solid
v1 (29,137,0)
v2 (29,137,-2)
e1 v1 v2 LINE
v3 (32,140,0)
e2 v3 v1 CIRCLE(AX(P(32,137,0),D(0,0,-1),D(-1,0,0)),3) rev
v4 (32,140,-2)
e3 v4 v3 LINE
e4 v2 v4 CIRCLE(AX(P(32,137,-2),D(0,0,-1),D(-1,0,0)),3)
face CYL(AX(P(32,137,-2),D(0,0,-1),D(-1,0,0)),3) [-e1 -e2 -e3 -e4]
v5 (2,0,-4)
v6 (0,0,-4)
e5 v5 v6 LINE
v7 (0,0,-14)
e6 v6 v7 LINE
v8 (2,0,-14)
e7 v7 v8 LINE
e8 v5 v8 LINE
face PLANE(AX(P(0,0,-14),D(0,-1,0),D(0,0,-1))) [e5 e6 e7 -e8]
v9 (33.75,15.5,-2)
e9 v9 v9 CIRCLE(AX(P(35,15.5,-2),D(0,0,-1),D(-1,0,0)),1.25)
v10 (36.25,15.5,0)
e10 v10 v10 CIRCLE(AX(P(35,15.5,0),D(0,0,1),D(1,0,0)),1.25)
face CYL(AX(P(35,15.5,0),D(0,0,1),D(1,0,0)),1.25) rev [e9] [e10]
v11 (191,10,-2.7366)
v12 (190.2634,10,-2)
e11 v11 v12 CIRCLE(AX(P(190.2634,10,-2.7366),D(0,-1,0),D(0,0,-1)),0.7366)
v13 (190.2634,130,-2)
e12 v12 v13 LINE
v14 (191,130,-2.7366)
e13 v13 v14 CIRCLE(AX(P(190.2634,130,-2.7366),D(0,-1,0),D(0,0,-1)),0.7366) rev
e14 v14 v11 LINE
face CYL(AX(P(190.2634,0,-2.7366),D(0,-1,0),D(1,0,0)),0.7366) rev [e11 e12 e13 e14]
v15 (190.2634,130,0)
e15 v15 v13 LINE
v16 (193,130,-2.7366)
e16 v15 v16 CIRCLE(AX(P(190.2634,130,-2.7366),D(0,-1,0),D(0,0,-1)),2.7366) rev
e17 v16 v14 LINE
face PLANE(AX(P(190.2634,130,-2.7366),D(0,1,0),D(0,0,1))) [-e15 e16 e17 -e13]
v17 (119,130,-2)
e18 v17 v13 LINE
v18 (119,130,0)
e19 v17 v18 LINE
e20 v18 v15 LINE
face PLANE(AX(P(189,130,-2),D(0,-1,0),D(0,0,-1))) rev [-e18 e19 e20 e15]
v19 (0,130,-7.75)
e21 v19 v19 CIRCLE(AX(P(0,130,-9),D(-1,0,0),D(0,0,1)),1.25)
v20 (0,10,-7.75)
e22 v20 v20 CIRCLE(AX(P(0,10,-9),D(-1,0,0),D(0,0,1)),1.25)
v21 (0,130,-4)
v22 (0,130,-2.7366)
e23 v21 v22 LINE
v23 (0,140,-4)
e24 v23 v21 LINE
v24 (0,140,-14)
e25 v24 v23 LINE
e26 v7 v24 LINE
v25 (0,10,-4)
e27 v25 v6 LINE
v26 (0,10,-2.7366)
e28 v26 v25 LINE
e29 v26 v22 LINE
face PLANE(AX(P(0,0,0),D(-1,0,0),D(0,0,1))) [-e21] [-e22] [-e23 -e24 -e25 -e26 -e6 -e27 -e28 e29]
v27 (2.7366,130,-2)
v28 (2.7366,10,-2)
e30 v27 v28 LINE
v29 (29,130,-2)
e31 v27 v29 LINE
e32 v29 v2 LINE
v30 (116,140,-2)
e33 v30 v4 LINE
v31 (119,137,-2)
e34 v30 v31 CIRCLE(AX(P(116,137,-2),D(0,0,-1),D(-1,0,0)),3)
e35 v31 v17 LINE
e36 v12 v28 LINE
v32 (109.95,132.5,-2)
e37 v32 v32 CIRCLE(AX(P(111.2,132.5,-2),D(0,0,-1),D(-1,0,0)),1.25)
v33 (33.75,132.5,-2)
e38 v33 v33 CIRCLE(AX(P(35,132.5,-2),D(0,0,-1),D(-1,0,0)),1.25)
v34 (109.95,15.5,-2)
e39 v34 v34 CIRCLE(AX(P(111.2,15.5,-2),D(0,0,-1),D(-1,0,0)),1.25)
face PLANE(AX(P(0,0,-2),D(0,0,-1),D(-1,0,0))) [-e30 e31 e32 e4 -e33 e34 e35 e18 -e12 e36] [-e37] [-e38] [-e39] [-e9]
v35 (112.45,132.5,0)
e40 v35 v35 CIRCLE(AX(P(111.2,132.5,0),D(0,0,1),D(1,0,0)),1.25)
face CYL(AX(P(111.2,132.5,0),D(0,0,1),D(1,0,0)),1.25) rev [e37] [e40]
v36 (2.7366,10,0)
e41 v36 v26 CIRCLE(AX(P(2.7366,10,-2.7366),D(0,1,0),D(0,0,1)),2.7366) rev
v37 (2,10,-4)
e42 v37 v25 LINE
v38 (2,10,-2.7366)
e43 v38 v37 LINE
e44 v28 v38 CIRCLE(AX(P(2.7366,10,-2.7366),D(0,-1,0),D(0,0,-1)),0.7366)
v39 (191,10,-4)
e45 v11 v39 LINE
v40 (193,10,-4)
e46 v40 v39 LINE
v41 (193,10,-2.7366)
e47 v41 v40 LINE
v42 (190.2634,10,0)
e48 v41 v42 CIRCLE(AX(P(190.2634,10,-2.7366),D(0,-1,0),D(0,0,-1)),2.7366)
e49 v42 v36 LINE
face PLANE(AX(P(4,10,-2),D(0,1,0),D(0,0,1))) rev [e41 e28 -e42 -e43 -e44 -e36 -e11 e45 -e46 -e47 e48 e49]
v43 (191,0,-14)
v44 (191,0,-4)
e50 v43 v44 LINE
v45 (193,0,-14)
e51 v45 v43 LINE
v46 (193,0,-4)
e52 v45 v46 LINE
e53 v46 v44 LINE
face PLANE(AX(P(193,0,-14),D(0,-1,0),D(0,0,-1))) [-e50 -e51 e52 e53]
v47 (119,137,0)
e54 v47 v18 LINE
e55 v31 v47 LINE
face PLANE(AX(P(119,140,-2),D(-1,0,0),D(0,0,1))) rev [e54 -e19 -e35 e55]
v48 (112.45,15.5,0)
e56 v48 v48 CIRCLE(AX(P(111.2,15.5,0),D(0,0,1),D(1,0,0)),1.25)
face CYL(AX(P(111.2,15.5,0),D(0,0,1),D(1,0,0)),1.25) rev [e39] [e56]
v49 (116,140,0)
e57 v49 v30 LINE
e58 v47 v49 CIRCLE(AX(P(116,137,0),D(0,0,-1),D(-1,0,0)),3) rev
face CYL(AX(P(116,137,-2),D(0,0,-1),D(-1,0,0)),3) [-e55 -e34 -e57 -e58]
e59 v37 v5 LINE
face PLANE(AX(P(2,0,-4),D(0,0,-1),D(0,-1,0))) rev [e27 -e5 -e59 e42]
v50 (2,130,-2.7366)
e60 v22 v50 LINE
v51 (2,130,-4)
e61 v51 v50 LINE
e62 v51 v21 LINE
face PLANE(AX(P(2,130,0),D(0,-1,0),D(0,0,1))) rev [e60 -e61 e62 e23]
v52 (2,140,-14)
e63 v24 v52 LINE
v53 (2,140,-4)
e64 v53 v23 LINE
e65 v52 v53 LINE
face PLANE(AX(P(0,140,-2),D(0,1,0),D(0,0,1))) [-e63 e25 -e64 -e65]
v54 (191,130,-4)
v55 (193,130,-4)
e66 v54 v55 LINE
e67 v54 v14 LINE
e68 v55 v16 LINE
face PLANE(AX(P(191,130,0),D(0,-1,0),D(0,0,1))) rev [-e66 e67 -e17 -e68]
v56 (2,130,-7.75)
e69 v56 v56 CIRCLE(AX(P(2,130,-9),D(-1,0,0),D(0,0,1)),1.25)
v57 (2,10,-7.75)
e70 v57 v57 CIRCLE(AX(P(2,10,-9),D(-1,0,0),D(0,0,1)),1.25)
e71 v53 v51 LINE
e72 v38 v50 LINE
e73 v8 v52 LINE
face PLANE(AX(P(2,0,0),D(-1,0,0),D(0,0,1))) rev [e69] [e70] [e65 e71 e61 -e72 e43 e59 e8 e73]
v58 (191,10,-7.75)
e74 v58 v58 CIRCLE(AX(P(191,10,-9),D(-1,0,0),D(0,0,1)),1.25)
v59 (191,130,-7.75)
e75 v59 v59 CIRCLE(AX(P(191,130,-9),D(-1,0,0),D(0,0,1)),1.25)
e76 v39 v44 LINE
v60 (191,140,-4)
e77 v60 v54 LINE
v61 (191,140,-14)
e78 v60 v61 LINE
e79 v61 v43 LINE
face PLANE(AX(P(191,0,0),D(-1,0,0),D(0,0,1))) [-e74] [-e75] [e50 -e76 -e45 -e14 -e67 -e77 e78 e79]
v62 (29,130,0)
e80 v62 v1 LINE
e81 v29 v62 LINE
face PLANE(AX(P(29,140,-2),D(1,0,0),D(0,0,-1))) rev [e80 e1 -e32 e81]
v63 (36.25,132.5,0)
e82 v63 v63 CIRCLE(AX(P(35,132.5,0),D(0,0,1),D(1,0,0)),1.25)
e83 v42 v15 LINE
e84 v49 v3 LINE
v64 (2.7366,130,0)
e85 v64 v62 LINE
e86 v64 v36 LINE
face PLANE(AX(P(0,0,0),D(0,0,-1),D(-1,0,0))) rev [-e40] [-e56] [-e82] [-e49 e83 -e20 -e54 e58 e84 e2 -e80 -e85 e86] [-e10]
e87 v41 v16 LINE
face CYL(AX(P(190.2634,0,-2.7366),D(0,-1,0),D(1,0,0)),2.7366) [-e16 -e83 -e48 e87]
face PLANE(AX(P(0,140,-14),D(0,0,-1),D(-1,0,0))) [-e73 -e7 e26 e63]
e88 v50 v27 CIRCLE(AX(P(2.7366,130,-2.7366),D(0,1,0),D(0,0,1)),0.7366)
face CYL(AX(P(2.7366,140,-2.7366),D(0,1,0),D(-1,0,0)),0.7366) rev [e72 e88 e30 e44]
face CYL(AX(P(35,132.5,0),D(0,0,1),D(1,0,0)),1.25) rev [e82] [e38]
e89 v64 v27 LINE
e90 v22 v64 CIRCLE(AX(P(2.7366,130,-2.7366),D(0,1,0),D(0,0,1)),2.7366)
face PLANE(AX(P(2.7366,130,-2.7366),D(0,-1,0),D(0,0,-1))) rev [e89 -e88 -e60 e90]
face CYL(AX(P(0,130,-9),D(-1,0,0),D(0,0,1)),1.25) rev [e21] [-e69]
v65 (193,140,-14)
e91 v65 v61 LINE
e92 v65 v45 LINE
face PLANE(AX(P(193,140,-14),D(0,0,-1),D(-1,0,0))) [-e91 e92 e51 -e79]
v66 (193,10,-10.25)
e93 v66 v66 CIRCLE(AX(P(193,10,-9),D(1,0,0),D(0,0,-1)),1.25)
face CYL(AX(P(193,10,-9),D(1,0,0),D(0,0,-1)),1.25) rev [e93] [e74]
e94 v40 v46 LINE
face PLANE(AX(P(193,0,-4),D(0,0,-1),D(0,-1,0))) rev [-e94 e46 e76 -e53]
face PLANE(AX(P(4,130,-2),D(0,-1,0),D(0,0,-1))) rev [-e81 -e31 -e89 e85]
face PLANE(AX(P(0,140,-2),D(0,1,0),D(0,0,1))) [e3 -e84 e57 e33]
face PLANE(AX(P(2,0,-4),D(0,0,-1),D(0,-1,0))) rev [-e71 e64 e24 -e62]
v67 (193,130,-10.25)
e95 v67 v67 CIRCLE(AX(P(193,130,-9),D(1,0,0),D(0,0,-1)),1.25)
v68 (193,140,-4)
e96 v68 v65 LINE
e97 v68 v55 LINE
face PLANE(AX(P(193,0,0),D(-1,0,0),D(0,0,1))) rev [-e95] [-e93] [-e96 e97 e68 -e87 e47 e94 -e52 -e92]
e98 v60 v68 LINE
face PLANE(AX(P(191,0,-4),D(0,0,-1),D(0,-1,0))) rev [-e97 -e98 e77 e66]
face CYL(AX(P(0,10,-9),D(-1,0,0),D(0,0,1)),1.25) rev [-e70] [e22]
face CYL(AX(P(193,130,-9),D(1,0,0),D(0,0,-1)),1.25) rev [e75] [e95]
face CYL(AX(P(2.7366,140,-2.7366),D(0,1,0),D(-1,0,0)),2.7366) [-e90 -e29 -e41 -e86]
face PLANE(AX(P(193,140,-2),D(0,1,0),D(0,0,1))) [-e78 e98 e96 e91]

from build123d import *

# Parameters (mm, degrees)
SKETCH_3_W                         = 193
SKETCH_3_H                         = 140
SM_BASE_FLANGE_1_DEPTH             = 2
SM_EDGE_FLANGE_1_STRIP_W           = 9.4732
SM_EDGE_FLANGE_1_STRIP_H           = 2
SM_EDGE_FLANGE_1_STRIP_CUT_DEPTH   = 140
SM_EDGE_FLANGE_1_STRIP_2_W         = 9.4732
SM_EDGE_FLANGE_1_STRIP_2_H         = 2
SM_EDGE_FLANGE_1_STRIP_CUT_2_DEPTH = 140
SM_EDGE_FLANGE_1_DEPTH             = 140
SM_EDGE_FLANGE_1_BEND_DEPTH        = 140
HOLE_WIZARD_M3_2_D                 = 2.5
HOLE_WIZARD_M3_3_D                 = 2.5
HOLE_WIZARD_M3_3_DEPTH             = 2
HOLE_WIZARD_M3_4_D                 = 2.5
SKETCH_23_W                        = 185
SKETCH_23_H                        = 10
SKETCH_23_W_2                      = 25
SKETCH_23_W_3                      = 70
CUT_EXTRUDE_1_DEPTH                = 10
FILLET_1_R                         = 3
SKETCH_24_W                        = 4
SKETCH_24_H                        = 10
CUT_EXTRUDE_2_DEPTH                = 239.840951263
SKETCH_25_W                        = 4
SKETCH_25_H                        = 10
CUT_EXTRUDE_3_DEPTH                = 10
SKETCH_26_W                        = 4
SKETCH_26_H                        = 10
CUT_EXTRUDE_4_DEPTH                = 10


# Sheet-metal steps are written as plain solids
with BuildPart() as part:
    # ｽｹｯﾁ3 → ﾍﾞｰｽ-ﾌﾗﾝｼﾞ1 (new body)
    with BuildSketch(Plane.XY):
        with Locations((96.5, 70)):
            Rectangle(SKETCH_3_W, SKETCH_3_H)
    extrude(amount=-SM_BASE_FLANGE_1_DEPTH)

    # ｴｯｼﾞ-ﾌﾗﾝｼﾞ1 strip (across the edge) → ｴｯｼﾞ-ﾌﾗﾝｼﾞ1 strip cut (cut)
    with BuildSketch(Plane(origin=(0, 0, -2), x_dir=(1, 0, 0), z_dir=(0, 1, 0))):
        with Locations((-2, -1)):
            Rectangle(SM_EDGE_FLANGE_1_STRIP_W, SM_EDGE_FLANGE_1_STRIP_H)
    extrude(amount=SM_EDGE_FLANGE_1_STRIP_CUT_DEPTH, mode=Mode.SUBTRACT)

    # ｴｯｼﾞ-ﾌﾗﾝｼﾞ1 strip 2 (across the edge) → ｴｯｼﾞ-ﾌﾗﾝｼﾞ1 strip cut 2 (cut)
    with BuildSketch(Plane(origin=(193, 140, -2), x_dir=(-1, 0, 0), z_dir=(0, -1, 0))):
        with Locations((-2, -1)):
            Rectangle(SM_EDGE_FLANGE_1_STRIP_2_W, SM_EDGE_FLANGE_1_STRIP_2_H)
    extrude(amount=SM_EDGE_FLANGE_1_STRIP_CUT_2_DEPTH, mode=Mode.SUBTRACT)

    # ｴｯｼﾞ-ﾌﾗﾝｼﾞ1 section (across the edge) → ｴｯｼﾞ-ﾌﾗﾝｼﾞ1 (add)
    with BuildSketch(Plane(origin=(0, 0, -2), x_dir=(1, 0, 0), z_dir=(0, 1, 0))):
        with BuildLine():
            Line((0, 0.7366), (0, 12))
            Line((0, 12), (2, 12))
            Line((2, 12), (2, 0.7366))
            ThreePointArc((2, 0.7366), (2.215745145, 0.215745145), (2.7366, 0))
            Line((2.7366, 0), (2.7366, -2))
            ThreePointArc((2.7366, -2), (0.801531583, -1.198468417), (0, 0.7366))
        make_face()
    extrude(amount=SM_EDGE_FLANGE_1_DEPTH)

    # ｴｯｼﾞ-ﾌﾗﾝｼﾞ1 section 2 (across the edge) → ｴｯｼﾞ-ﾌﾗﾝｼﾞ1 bend (add)
    with BuildSketch(Plane(origin=(193, 140, -2), x_dir=(-1, 0, 0), z_dir=(0, -1, 0))):
        with BuildLine():
            Line((0, 0.7366), (0, 12))
            Line((0, 12), (2, 12))
            Line((2, 12), (2, 0.7366))
            ThreePointArc((2, 0.7366), (2.215745145, 0.215745145), (2.7366, 0))
            Line((2.7366, 0), (2.7366, -2))
            ThreePointArc((2.7366, -2), (0.801531583, -1.198468417), (0, 0.7366))
        make_face()
    extrude(amount=SM_EDGE_FLANGE_1_BEND_DEPTH)

    # M3 ねじ穴2 (through all)
    with Locations(Plane.XY):
        with Locations((35, 132.5), (35, 15.5), (111.2, 15.5), (111.2, 132.5)):
            Hole(HOLE_WIZARD_M3_2_D / 2)

    # M3 ねじ穴3
    with Locations(Plane.ZY):
        with Locations((-9, 130), (-9, 10)):
            Hole(HOLE_WIZARD_M3_3_D / 2, depth=HOLE_WIZARD_M3_3_DEPTH)

    # M3 ねじ穴4 (through all)
    with Locations(Plane(origin=(193, 0, 0), x_dir=(0, 0, -1), z_dir=(1, 0, 0))):
        with Locations((9, 130), (9, 10)):
            Hole(HOLE_WIZARD_M3_4_D / 2)

    # ｽｹｯﾁ23 → ｶｯﾄ - 押し出し1 (cut)
    with BuildSketch(Plane.XY):
        with Locations((96.5, 5)):
            Rectangle(SKETCH_23_W, SKETCH_23_H)
        with Locations((16.5, 135)):
            Rectangle(SKETCH_23_W_2, SKETCH_23_H)
        with Locations((154, 135)):
            Rectangle(SKETCH_23_W_3, SKETCH_23_H)
    extrude(amount=-CUT_EXTRUDE_1_DEPTH, mode=Mode.SUBTRACT)

    # ﾌｨﾚｯﾄ1
    fillet_1_edges = [part.edges().sort_by_distance(p)[0] for p in [
        (29, 140, -1),
        (119, 140, -1),
    ]]
    fillet(fillet_1_edges, radius=FILLET_1_R)

    # ｽｹｯﾁ24 → ｶｯﾄ - 押し出し2 (cut, through all)
    with BuildSketch(Plane.ZY):
        with Locations((-2, 5)):
            Rectangle(SKETCH_24_W, SKETCH_24_H)
    extrude(amount=-CUT_EXTRUDE_2_DEPTH, mode=Mode.SUBTRACT)

    # ｽｹｯﾁ25 → ｶｯﾄ - 押し出し3 (cut)
    with BuildSketch(Plane.ZY):
        with Locations((-2, 135)):
            Rectangle(SKETCH_25_W, SKETCH_25_H)
    extrude(amount=-CUT_EXTRUDE_3_DEPTH, mode=Mode.SUBTRACT)

    # ｽｹｯﾁ26 → ｶｯﾄ - 押し出し4 (cut)
    with BuildSketch(Plane(origin=(193, 0, 0), x_dir=(0, 0, -1), z_dir=(1, 0, 0))):
        with Locations((2, 135)):
            Rectangle(SKETCH_26_W, SKETCH_26_H)
    extrude(amount=-CUT_EXTRUDE_4_DEPTH, mode=Mode.SUBTRACT)


solid = part.part
